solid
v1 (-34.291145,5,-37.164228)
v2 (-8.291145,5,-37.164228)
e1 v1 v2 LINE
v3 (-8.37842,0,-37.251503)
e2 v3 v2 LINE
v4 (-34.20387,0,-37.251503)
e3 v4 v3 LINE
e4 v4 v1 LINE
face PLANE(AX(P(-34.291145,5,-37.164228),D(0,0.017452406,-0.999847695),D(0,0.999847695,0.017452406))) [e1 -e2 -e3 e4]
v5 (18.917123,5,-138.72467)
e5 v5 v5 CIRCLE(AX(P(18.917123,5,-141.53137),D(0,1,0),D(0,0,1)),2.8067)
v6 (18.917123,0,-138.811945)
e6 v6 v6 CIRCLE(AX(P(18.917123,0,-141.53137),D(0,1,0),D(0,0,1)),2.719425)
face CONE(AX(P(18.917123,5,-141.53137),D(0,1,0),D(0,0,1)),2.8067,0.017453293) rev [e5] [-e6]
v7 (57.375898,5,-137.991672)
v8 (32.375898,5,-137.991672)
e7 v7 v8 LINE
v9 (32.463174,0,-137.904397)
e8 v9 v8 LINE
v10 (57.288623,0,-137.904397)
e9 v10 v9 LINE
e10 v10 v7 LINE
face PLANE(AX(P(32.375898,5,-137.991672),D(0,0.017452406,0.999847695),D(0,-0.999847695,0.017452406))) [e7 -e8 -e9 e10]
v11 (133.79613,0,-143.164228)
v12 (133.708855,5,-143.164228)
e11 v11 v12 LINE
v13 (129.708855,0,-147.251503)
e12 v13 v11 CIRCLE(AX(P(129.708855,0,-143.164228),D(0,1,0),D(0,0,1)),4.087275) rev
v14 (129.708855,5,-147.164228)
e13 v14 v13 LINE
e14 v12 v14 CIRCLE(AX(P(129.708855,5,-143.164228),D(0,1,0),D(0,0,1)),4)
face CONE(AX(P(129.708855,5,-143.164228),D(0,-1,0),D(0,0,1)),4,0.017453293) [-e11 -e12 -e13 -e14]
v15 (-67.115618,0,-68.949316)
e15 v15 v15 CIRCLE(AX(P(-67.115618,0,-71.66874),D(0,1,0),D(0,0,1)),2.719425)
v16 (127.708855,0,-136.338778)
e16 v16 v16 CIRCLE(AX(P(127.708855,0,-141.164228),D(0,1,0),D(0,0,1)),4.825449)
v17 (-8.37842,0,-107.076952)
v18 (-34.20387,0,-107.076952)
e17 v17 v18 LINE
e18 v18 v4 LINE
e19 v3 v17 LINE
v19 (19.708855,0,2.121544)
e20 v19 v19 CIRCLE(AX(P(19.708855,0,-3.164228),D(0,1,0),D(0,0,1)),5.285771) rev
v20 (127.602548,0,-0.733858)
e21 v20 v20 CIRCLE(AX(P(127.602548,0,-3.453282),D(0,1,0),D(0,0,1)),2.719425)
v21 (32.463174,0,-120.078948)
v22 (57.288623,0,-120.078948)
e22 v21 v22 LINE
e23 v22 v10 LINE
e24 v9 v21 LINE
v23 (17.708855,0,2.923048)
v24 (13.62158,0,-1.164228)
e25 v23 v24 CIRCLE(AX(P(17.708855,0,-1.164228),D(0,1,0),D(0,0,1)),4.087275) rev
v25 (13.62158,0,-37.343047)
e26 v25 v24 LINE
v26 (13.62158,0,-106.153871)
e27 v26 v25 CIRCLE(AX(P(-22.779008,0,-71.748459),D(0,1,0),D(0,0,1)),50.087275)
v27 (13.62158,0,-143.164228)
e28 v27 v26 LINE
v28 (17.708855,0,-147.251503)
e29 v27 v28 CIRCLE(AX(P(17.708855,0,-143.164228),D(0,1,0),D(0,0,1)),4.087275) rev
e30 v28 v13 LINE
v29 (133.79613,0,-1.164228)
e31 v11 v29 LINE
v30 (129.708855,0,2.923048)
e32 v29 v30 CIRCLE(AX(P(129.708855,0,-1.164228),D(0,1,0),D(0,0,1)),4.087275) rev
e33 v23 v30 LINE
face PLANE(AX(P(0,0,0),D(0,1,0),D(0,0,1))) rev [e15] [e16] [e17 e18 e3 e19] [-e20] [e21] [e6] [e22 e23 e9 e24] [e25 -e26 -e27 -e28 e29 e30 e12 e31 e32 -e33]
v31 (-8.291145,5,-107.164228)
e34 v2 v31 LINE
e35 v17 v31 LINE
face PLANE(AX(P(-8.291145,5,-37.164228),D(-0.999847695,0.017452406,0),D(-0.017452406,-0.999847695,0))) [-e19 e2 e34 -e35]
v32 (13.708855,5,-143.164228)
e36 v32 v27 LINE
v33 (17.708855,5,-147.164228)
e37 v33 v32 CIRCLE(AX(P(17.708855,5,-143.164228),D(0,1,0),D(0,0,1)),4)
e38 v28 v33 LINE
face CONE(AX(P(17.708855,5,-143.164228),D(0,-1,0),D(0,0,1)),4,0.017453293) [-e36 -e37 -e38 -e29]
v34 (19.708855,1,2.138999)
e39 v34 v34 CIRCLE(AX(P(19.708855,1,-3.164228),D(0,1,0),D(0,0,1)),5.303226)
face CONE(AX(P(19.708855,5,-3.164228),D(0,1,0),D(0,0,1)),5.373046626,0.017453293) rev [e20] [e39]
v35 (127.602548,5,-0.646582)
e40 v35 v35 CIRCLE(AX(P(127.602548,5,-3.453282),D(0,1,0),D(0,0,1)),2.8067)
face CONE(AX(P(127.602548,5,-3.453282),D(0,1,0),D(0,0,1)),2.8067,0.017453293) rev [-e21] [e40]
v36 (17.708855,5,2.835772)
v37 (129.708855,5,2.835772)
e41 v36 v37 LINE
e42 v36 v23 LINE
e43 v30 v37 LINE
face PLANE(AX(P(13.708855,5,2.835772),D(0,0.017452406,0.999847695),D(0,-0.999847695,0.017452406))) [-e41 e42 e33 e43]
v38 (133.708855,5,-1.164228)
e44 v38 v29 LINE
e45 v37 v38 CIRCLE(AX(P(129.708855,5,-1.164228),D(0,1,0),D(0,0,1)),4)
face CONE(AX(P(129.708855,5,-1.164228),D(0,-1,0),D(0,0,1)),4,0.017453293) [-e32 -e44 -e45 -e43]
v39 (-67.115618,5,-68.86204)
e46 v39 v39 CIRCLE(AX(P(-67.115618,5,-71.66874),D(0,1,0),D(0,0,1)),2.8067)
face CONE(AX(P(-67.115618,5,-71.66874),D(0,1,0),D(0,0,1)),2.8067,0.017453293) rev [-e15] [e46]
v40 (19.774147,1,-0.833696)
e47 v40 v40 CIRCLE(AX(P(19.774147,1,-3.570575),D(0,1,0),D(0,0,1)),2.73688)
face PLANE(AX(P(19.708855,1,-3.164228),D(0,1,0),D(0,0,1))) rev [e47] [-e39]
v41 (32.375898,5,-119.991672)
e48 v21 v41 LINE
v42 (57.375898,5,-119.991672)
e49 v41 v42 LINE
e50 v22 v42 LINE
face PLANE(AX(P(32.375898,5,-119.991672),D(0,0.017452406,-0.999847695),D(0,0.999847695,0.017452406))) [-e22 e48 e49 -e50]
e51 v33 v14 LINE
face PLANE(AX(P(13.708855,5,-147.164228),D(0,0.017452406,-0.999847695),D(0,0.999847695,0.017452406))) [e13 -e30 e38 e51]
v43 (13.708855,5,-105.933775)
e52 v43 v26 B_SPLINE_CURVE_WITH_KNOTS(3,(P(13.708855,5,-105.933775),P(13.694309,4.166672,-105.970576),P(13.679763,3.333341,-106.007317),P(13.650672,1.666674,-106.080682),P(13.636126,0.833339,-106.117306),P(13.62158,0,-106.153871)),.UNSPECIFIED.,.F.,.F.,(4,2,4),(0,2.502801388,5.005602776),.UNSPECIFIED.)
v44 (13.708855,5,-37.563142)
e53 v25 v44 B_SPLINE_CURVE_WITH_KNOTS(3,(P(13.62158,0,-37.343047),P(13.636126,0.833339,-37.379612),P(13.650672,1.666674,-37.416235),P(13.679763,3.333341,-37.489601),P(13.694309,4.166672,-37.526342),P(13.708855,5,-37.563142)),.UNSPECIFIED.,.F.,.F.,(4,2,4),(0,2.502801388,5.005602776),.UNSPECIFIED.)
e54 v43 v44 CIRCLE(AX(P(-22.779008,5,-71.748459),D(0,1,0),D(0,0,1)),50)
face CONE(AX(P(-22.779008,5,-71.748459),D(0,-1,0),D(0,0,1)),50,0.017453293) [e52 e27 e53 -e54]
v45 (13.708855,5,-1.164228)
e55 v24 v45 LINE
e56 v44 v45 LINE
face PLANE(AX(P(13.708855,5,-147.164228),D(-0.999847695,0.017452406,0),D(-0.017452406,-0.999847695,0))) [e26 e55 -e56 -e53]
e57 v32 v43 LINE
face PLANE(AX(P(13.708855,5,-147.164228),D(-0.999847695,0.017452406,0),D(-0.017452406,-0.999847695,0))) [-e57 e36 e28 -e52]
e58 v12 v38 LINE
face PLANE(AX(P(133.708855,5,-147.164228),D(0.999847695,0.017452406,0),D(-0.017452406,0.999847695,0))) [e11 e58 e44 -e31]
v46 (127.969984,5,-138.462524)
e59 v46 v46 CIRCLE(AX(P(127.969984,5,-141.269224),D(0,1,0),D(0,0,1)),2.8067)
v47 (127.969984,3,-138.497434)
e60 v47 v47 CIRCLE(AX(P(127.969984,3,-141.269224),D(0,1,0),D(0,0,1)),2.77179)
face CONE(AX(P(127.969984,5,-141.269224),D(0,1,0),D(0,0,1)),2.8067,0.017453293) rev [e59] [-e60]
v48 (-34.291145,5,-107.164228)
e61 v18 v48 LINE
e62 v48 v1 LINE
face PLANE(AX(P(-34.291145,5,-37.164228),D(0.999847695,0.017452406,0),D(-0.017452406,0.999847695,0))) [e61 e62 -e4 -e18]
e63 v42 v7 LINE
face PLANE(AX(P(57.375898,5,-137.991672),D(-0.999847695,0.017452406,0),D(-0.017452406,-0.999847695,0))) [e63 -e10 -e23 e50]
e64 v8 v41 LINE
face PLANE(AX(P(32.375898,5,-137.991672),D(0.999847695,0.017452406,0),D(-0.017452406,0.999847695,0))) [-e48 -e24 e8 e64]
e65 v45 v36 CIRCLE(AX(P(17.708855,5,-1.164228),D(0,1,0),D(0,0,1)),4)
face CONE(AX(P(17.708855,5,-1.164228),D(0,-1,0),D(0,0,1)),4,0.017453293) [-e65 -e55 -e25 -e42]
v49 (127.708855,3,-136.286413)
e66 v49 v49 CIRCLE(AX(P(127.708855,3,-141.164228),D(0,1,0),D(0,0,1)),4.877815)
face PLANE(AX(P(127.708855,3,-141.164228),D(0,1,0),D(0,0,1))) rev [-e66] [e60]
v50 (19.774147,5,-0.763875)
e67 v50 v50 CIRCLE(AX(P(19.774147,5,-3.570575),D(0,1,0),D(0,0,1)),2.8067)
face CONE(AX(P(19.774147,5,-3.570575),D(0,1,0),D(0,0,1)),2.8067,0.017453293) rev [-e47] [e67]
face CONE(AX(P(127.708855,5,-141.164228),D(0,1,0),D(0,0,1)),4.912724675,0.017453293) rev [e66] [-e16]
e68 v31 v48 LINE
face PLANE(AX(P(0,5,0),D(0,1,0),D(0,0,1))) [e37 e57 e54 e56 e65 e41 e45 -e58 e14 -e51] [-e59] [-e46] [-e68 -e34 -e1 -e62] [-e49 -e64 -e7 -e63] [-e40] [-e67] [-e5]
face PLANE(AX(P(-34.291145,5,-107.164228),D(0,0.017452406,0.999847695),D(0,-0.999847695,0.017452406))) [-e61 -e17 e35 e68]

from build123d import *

# Parameters (mm, degrees)
SKETCH8_W                      = 120
SKETCH8_H                      = 150
BOSS_EXTRUDE3_DEPTH            = 5
SKETCH9_R                      = 50
BOSS_EXTRUDE4_DEPTH            = 5
BOSS_EXTRUDE8_OUTLINE_R        = 5.460321951
BOSS_EXTRUDE8_DEPTH            = 1
CUT_EXTRUDE9_OUTLINE_R         = 5
CUT_EXTRUDE9_DEPTH             = 3
F_2_0_221_DIAMETER_HOLE1_D     = 5.6134
F_2_0_221_DIAMETER_HOLE1_DEPTH = 8
F_2_0_221_DIAMETER_HOLE1_TIP   = 1.686435499
FILLET3_R                      = 4
SKETCH38_W                     = 26
SKETCH38_H                     = 70
CUT_EXTRUDE10_DEPTH            = 40
SKETCH39_W                     = 25
SKETCH39_H                     = 18
CUT_EXTRUDE11_DEPTH            = 40
DRAFT1_ANGLE                   = 1
DRAFT2_ANGLE                   = 1


# Read off the part's stored shape, not the designer's step: Boss-Extrude8, Cut-Extrude9, Draft5, Draft6
with BuildPart() as part:
    # Sketch8 → Boss-Extrude3 (new body)
    with BuildSketch(Plane(origin=(0, 0, 0), x_dir=(1, 0, 0), z_dir=(0, 1, 0))):
        with Locations((73.708855083, 72.164227744)):
            Rectangle(SKETCH8_W, SKETCH8_H)
    extrude(amount=BOSS_EXTRUDE3_DEPTH)

    # Sketch9 → Boss-Extrude4 (add)
    with BuildSketch(Plane(origin=(0, 0, 0), x_dir=(1, 0, 0), z_dir=(0, 1, 0))):
        with Locations((-22.779007595, 71.748458752)):
            Circle(SKETCH9_R)
    extrude(amount=BOSS_EXTRUDE4_DEPTH)

    # Boss-Extrude8 outline → Boss-Extrude8 (cut)
    with BuildSketch(Plane(origin=(0, 0, 0), x_dir=(1, 0, 0), z_dir=(0, 1, 0))):
        with Locations((19.708855083, 3.164227744)):
            Circle(BOSS_EXTRUDE8_OUTLINE_R)
    extrude(amount=BOSS_EXTRUDE8_DEPTH, mode=Mode.SUBTRACT)

    # Cut-Extrude9 outline → Cut-Extrude9 (cut)
    with BuildSketch(Plane(origin=(0, 0, 0), x_dir=(1, 0, 0), z_dir=(0, 1, 0))):
        with Locations((127.708855083, 141.164227744)):
            Circle(CUT_EXTRUDE9_OUTLINE_R)
    extrude(amount=CUT_EXTRUDE9_DEPTH, mode=Mode.SUBTRACT)

    # #2 (0.221) Diameter Hole1
    with Locations(Plane(origin=(0, 5, 0), x_dir=(1, 0, 0), z_dir=(0, 1, 0))):
        with Locations((18.917123201, 141.531370062), (127.969984407, 141.269223761), (127.602547564, 3.45328248), (19.774147178, 3.570575466), (-67.115618064, 71.668740496)):
            Hole(F_2_0_221_DIAMETER_HOLE1_D / 2, depth=F_2_0_221_DIAMETER_HOLE1_DEPTH)
            with Locations((0, 0, -(F_2_0_221_DIAMETER_HOLE1_DEPTH + F_2_0_221_DIAMETER_HOLE1_TIP / 2))):  # 118° drill point
                Cone(0, F_2_0_221_DIAMETER_HOLE1_D / 2, F_2_0_221_DIAMETER_HOLE1_TIP, mode=Mode.SUBTRACT)

    # Fillet3
    fillet3_edges = [part.edges().sort_by_distance(p)[0] for p in [
        (13.708855083, 2.5, -147.164227744),
        (133.708855083, 2.5, -147.164227744),
        (133.708855083, 2.5, 2.835772256),
        (13.708855083, 2.5, 2.835772256),
    ]]
    fillet(fillet3_edges, radius=FILLET3_R)

    # Sketch38 → Cut-Extrude10 (cut)
    with BuildSketch(Plane(origin=(0, 5, 0), x_dir=(1, 0, 0), z_dir=(0, 1, 0))):
        with Locations((-21.291144917, 72.164227744)):
            Rectangle(SKETCH38_W, SKETCH38_H)
    extrude(amount=-CUT_EXTRUDE10_DEPTH, mode=Mode.SUBTRACT)

    # Sketch39 → Cut-Extrude11 (cut)
    with BuildSketch(Plane(origin=(0, 5, 0), x_dir=(1, 0, 0), z_dir=(0, 1, 0))):
        with Locations((44.875898376, 128.991672485)):
            Rectangle(SKETCH39_W, SKETCH39_H)
    extrude(amount=-CUT_EXTRUDE11_DEPTH, mode=Mode.SUBTRACT)

    # Draft1
    draft1_faces = [part.faces().sort_by_distance(p)[0] for p in [
        (130.409247564, 2.5, -3.45328248),
        (132.537282207, 2.5, 1.664199381),
        (73.708855083, 2.5, 2.835772256),
        (44.875898376, 2.5, -137.991672485),
        (-21.291144917, 2.5, -107.164227744),
        (14.880427958, 2.5, 1.664199381),
        (57.375898376, 2.5, -128.991672485),
        (-34.291144917, 2.5, -72.164227744),
        (32.375898376, 2.5, -128.991672485),
        (133.708855083, 2.5, -72.164227744),
        (130.776684407, 4, -141.269223761),
        (132.537282207, 2.5, -145.992654868),
        (13.708855083, 2.5, -19.363684902),
        (22.580847178, 3, -3.570575466),
        (13.708855083, 2.5, -124.549001593),
        (-8.291144917, 2.5, -72.164227744),
        (-64.308918064, 2.5, -71.668740496),
        (-21.291144917, 2.5, -37.164227744),
        (-72.779007595, 2.5, -71.748458752),
        (21.723823201, 2.5, -141.531370062),
        (14.880427958, 2.5, -145.992654868),
        (44.875898376, 2.5, -119.991672485),
        (73.708855083, 2.5, -147.164227744),
    ]]
    draft(draft1_faces, Plane.ZX.offset(5), DRAFT1_ANGLE)

    # Draft2
    draft2_faces = [part.faces().sort_by_distance(p)[0] for p in [
        (14.248533132, 0.5, -3.164227744),
        (122.708855083, 1.5, -141.164227744),
    ]]
    draft(draft2_faces, Plane(origin=(0, 0, 0), x_dir=(0, 0, -1), z_dir=(0, -1, 0)), DRAFT2_ANGLE)

    # Draft5 outline → Draft5 (revolve)
    with BuildSketch(Plane(origin=(19.708855083, 0, -3.164227744), x_dir=(1, 0, 0), z_dir=(0, 0, 1))):
        Polygon((5.303226367, 1), (5.285771302, 0), (5.460321951, 0), (5.442866886, 1), align=None)
    revolve(axis=Axis((19.708855083, 0, -3.164227744), (0, 1, 0)))

    # Draft6 outline → Draft6 (revolve)
    with BuildSketch(Plane(origin=(127.708855083, 0, -141.164227744), x_dir=(1, 0, 0), z_dir=(0, 0, 1))):
        Polygon((4.877814546, 3), (4.825449351, 0), (5, 0), (4.947634805, 3), align=None)
    revolve(axis=Axis((127.708855083, 0, -141.164227744), (0, 1, 0)))


solid = part.part
